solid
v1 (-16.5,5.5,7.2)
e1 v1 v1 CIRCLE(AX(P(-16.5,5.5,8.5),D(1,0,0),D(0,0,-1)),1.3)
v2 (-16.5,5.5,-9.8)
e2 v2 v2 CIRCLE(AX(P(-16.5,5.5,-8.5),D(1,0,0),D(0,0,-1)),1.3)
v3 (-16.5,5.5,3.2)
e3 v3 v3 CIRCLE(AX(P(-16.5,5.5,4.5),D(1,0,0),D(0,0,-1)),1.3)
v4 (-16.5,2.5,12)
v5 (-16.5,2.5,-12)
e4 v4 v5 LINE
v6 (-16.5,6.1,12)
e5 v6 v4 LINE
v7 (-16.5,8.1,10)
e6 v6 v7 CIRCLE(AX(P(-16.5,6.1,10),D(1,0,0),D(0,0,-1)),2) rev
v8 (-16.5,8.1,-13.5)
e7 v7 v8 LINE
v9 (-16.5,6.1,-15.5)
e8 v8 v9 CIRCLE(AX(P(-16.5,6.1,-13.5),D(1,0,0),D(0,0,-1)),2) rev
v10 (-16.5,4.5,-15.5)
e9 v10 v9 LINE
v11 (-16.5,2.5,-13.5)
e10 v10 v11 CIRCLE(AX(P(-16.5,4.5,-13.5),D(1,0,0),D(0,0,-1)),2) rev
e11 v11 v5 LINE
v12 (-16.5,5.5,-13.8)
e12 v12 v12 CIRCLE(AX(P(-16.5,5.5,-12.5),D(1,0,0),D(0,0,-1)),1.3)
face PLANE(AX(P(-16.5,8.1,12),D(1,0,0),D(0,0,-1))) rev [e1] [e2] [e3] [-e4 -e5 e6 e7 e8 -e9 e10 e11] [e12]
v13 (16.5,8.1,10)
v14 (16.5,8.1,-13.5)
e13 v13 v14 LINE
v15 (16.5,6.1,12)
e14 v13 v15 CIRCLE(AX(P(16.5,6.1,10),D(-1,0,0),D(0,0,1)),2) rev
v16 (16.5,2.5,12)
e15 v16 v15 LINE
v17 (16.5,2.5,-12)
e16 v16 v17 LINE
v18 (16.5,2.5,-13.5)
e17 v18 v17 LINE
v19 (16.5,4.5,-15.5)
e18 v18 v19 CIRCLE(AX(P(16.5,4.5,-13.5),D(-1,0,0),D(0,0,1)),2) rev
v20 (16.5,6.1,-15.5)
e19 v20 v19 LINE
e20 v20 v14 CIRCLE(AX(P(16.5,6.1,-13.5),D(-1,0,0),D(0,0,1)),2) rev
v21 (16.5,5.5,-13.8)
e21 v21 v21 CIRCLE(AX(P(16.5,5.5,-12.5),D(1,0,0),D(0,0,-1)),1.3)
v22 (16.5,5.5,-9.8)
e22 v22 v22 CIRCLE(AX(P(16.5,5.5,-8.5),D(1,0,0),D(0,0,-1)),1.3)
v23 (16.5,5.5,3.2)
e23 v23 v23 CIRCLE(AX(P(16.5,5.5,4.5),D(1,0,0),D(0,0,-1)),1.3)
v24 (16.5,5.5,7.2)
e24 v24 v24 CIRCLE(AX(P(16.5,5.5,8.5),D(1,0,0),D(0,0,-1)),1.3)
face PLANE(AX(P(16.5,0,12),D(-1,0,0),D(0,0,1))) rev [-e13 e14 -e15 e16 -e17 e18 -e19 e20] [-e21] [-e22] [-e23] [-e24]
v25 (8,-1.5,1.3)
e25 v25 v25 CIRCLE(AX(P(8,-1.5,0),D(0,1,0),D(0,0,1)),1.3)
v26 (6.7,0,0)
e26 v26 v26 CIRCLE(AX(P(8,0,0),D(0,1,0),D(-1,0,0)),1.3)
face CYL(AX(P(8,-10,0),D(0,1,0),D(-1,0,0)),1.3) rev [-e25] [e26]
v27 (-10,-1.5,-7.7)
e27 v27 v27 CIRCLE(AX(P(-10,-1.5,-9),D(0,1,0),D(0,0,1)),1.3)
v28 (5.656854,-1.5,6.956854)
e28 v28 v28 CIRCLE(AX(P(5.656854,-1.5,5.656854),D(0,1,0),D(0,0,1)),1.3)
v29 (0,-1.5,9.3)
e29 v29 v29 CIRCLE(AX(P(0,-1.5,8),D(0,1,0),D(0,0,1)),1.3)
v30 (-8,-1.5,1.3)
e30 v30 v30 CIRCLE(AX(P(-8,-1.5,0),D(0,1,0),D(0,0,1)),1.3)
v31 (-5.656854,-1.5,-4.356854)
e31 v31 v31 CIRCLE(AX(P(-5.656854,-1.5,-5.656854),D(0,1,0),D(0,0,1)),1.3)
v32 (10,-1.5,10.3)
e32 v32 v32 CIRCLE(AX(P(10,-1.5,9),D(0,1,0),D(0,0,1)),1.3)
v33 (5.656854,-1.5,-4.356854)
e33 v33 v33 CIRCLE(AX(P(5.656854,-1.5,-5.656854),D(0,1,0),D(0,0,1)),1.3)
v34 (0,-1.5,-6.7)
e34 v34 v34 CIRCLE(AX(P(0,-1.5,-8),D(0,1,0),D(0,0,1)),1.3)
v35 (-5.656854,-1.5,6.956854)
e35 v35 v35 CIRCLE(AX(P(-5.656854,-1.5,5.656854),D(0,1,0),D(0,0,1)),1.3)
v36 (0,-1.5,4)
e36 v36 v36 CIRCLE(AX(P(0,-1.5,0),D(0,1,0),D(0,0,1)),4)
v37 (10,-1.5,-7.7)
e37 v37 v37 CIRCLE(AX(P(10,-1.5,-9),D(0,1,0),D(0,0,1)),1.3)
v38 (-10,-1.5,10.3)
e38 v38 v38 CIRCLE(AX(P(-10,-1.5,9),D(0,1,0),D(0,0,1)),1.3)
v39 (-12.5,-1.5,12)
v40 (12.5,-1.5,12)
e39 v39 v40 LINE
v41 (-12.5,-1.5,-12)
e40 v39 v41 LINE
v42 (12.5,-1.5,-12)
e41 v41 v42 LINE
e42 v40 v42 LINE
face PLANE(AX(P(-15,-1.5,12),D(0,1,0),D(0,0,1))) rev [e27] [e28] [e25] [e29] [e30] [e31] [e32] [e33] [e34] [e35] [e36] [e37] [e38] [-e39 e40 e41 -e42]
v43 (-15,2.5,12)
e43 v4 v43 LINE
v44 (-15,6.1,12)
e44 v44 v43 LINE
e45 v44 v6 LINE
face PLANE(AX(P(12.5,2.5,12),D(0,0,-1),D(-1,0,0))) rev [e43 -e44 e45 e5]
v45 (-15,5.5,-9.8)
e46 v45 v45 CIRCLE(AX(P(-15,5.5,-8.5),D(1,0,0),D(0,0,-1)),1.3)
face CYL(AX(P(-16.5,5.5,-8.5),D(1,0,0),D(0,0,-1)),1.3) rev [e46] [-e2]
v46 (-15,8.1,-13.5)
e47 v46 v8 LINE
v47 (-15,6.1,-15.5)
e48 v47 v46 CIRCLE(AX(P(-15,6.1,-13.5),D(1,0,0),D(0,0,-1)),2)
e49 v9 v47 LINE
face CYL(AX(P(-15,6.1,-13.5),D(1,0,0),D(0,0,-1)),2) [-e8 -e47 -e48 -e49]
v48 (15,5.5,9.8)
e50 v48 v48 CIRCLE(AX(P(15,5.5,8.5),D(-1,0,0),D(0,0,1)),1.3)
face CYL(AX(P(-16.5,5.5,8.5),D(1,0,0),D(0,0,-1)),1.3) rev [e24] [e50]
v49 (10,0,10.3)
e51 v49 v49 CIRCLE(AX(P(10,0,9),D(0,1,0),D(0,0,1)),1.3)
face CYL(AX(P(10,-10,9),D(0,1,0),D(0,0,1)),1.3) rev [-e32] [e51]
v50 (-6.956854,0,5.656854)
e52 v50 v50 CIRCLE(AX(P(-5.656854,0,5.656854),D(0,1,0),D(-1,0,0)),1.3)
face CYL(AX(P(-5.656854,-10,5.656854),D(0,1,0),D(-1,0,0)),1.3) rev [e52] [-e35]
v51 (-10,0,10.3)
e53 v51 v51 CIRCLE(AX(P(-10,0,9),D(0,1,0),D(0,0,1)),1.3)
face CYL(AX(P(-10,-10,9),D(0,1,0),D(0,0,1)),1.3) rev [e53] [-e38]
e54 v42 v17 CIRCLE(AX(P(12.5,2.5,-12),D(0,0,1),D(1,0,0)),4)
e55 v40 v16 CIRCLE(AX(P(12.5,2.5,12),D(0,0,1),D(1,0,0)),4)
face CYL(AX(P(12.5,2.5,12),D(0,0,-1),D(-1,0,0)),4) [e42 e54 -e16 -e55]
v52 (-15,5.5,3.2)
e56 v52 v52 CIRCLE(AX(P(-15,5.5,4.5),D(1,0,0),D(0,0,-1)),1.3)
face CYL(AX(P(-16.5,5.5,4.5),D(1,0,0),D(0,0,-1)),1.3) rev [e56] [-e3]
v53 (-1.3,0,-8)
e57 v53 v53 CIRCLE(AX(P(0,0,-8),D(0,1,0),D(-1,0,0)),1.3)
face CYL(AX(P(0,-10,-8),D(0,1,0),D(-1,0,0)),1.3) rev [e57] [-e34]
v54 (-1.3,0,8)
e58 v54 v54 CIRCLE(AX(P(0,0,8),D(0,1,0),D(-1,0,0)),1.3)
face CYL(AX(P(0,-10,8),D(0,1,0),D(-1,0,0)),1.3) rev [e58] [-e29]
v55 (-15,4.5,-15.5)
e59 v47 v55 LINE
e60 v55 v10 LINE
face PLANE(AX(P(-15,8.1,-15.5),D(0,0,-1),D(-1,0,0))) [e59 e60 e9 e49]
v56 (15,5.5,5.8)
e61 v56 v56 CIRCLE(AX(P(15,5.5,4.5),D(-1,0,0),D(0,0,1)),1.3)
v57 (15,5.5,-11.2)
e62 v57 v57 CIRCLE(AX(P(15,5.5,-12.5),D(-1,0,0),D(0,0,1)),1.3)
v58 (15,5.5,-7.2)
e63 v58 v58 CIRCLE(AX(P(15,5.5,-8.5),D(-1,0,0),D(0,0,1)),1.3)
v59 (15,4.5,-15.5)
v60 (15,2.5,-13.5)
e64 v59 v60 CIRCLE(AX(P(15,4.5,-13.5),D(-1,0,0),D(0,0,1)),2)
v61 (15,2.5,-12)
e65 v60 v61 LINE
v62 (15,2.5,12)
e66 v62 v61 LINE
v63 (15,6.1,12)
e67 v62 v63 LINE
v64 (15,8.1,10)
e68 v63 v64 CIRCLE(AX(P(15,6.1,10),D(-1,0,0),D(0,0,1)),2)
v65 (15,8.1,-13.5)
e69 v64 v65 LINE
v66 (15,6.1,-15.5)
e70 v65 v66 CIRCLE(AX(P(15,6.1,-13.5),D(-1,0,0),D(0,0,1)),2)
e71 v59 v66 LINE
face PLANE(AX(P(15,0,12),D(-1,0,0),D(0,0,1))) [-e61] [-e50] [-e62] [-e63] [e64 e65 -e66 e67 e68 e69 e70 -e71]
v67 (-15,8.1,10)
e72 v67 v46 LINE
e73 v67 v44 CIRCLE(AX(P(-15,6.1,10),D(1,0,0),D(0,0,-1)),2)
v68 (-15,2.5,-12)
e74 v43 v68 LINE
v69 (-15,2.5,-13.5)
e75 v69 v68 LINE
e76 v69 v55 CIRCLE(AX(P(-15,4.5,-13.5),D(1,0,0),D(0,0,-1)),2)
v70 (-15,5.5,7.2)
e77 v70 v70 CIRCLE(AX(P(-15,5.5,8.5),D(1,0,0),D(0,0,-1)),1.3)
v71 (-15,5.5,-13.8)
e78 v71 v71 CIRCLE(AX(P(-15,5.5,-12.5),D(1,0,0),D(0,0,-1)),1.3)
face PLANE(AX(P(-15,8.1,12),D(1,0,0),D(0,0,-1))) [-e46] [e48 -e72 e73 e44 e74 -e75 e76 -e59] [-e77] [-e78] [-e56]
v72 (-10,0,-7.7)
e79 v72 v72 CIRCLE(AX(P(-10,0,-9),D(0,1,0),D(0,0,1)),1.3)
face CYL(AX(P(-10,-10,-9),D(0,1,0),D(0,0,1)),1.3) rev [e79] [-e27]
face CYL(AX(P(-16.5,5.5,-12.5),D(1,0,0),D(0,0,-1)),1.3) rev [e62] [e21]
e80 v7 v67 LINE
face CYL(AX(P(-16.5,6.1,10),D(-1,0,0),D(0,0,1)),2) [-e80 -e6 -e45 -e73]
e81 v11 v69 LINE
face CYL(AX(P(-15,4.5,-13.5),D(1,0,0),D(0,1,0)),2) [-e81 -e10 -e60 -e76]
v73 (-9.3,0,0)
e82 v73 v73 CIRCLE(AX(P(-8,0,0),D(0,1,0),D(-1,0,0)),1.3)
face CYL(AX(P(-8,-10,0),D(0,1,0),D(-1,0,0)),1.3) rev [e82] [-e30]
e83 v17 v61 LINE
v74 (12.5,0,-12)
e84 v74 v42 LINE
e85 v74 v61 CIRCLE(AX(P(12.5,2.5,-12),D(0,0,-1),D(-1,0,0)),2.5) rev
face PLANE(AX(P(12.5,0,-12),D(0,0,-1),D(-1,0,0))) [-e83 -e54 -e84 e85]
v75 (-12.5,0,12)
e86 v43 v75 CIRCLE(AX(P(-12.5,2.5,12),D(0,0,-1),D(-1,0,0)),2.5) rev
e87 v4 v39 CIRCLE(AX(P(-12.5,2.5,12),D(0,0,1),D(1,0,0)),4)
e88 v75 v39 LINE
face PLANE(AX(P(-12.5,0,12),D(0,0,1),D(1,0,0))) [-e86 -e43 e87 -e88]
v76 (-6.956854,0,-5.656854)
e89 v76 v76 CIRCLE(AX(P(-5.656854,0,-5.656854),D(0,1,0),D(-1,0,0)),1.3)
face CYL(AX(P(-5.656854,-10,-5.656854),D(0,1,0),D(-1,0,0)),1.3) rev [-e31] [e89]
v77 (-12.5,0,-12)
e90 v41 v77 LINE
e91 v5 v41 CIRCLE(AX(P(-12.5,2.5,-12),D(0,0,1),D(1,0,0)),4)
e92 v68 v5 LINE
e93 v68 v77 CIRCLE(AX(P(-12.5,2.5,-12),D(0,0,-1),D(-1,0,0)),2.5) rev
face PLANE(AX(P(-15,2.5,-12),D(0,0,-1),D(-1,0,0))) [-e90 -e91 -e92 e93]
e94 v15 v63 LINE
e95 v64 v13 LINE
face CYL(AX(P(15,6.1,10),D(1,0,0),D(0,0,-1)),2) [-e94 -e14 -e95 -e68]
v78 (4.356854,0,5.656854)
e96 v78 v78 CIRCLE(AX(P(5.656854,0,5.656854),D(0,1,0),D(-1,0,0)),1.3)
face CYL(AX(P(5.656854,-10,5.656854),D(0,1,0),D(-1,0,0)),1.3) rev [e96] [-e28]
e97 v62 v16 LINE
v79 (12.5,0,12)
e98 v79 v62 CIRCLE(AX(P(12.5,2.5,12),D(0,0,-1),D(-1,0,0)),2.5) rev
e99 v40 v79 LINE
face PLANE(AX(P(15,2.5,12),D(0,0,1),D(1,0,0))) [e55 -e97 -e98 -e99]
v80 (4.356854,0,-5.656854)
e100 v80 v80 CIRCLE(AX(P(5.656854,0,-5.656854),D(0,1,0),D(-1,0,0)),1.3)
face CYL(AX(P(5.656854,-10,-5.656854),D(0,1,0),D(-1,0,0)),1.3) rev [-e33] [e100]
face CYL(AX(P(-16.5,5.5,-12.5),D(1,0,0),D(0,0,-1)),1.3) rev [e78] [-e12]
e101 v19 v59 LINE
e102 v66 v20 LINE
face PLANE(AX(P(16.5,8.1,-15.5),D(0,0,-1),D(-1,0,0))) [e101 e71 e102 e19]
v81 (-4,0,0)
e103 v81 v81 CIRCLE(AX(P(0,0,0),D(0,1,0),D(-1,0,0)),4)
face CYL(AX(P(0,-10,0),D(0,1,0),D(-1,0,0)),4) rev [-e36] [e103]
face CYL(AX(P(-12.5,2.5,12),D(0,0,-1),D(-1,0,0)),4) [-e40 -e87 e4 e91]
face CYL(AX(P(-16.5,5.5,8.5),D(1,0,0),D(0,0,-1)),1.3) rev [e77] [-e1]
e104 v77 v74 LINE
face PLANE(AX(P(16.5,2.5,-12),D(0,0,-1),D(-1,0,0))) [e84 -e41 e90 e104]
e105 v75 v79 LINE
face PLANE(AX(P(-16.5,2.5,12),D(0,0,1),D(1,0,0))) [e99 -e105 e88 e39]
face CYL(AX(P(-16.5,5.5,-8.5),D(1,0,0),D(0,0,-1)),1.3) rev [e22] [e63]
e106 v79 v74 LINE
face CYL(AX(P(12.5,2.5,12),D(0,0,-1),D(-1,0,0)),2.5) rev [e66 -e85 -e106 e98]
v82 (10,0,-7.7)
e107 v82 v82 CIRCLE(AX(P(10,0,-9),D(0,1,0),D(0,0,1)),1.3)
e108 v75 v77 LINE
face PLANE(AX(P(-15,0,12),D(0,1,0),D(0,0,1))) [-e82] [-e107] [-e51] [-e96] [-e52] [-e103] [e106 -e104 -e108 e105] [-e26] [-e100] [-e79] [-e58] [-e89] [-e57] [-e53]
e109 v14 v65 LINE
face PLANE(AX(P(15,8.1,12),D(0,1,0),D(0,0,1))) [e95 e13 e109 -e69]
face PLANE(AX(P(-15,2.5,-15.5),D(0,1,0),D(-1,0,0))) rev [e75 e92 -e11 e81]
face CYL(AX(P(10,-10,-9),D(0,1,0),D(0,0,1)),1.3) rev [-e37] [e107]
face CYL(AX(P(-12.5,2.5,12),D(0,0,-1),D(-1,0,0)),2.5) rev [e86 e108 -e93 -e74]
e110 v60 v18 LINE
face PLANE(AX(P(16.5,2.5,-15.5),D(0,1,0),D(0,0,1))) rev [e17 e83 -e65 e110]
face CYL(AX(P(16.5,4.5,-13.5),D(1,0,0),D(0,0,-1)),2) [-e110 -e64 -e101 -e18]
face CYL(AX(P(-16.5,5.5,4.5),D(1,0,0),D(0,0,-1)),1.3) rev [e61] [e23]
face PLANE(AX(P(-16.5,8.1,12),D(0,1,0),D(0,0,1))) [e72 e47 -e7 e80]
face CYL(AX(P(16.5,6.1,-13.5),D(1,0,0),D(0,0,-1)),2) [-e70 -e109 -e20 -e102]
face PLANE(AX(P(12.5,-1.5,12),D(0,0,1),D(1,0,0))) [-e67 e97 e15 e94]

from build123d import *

# Parameters (mm, degrees)
BASE_FLANGE1_DEPTH      = 12
SKETCH5_R               = 4
SKETCH5_R_2             = 1.3
CUT_EXTRUDE1_DEPTH      = 10
SKETCH6_W               = 1.5
SKETCH6_H               = 5.6
BOSS_EXTRUDE1_DEPTH     = 3.5
CUT_EXTRUDE2_DEPTH      = 25.04391815
CUT_EXTRUDE2_DEPTH_BACK = 25.04391815
SKETCH7_R               = 1.3
FILLET1_R               = 2
SKETCH8_R               = 1.3
CUT_EXTRUDE3_DEPTH      = 10


# Sheet-metal steps are written as plain solids
with BuildPart() as part:
    # Sketch1 → Base-Flange1 (new, symmetric)
    with BuildSketch(Plane.XY):
        with BuildLine():
            Line((-15, 8.1), (-15, 2.5))
            ThreePointArc((-15, 2.5), (-14.267766953, 0.732233047), (-12.5, 0))
            Line((-12.5, 0), (12.5, 0))
            ThreePointArc((12.5, 0), (14.267766953, 0.732233047), (15, 2.5))
            Line((15, 2.5), (15, 8.1))
            Line((15, 8.1), (16.5, 8.1))
            Line((16.5, 8.1), (16.5, 2.5))
            ThreePointArc((16.5, 2.5), (15.328427125, -0.328427125), (12.5, -1.5))
            Line((12.5, -1.5), (-12.5, -1.5))
            ThreePointArc((-12.5, -1.5), (-15.328427125, -0.328427125), (-16.5, 2.5))
            Line((-16.5, 2.5), (-16.5, 8.1))
            Line((-16.5, 8.1), (-15, 8.1))
        make_face()
    extrude(amount=BASE_FLANGE1_DEPTH, both=True)

    # Sketch5 → Cut-Extrude1 (cut)
    with BuildSketch(Plane(origin=(0, 0, 0), x_dir=(1, 0, 0), z_dir=(0, 1, 0))):
        with Locations(Location((0, 0, 0), (0, 0, 180))):
            Circle(SKETCH5_R)
        with Locations(Location((0, 8, 0), (0, 0, 180))):
            Circle(SKETCH5_R_2)
        with Locations(Location((5.656854249, 5.656854249, 0), (0, 0, 180))):
            Circle(SKETCH5_R_2)
        with Locations(Location((8, 0, 0), (0, 0, 180))):
            Circle(SKETCH5_R_2)
        with Locations(Location((5.656854249, -5.656854249, 0), (0, 0, 180))):
            Circle(SKETCH5_R_2)
        with Locations(Location((0, -8, 0), (0, 0, 180))):
            Circle(SKETCH5_R_2)
        with Locations(Location((-5.656854249, -5.656854249, 0), (0, 0, 180))):
            Circle(SKETCH5_R_2)
        with Locations(Location((-8, 0, 0), (0, 0, 180))):
            Circle(SKETCH5_R_2)
        with Locations(Location((-5.656854249, 5.656854249, 0), (0, 0, 180))):
            Circle(SKETCH5_R_2)
    extrude(amount=-CUT_EXTRUDE1_DEPTH, mode=Mode.SUBTRACT)

    # Sketch6 → Boss-Extrude1 (add)
    with BuildSketch(Plane(origin=(0, 0, -12), x_dir=(-1, 0, 0), z_dir=(0, 0, -1))):
        with Locations((-15.75, 5.3)):
            Rectangle(SKETCH6_W, SKETCH6_H)
        with Locations((15.75, 5.3)):
            Rectangle(SKETCH6_W, SKETCH6_H)
    extrude(amount=BOSS_EXTRUDE1_DEPTH)

    # Sketch7 → Cut-Extrude2 (cut, two sides: drawn at the far end of the back side and taken through both)
    with BuildSketch(Plane(origin=(0, 0, 0), x_dir=(0, 0, -1), z_dir=(1, 0, 0)).offset(-CUT_EXTRUDE2_DEPTH_BACK)):
        with Locations((-8.5, 5.5)):
            Circle(SKETCH7_R)
        with Locations((-4.5, 5.5)):
            Circle(SKETCH7_R)
        with Locations((8.5, 5.5)):
            Circle(SKETCH7_R)
        with Locations((12.5, 5.5)):
            Circle(SKETCH7_R)
    extrude(amount=CUT_EXTRUDE2_DEPTH + CUT_EXTRUDE2_DEPTH_BACK, mode=Mode.SUBTRACT)

    # Fillet1
    fillet1_edges = [part.edges().sort_by_distance(p)[0] for p in [
        (15.75, 8.1, -15.5),
        (15.75, 2.5, -15.5),
        (-15.75, 8.1, -15.5),
        (-15.75, 2.5, -15.5),
        (-15.75, 8.1, 12),
        (15.75, 8.1, 12),
    ]]
    fillet(fillet1_edges, radius=FILLET1_R)

    # Sketch8 → Cut-Extrude3 (cut)
    with BuildSketch(Plane(origin=(0, 0, 0), x_dir=(1, 0, 0), z_dir=(0, 1, 0))):
        with Locations(Location((-10, 9, 0), (0, 0, 270))):
            Circle(SKETCH8_R)
        with Locations(Location((10, 9, 0), (0, 0, 270))):
            Circle(SKETCH8_R)
        with Locations(Location((-10, -9, 0), (0, 0, 270))):
            Circle(SKETCH8_R)
        with Locations(Location((10, -9, 0), (0, 0, 270))):
            Circle(SKETCH8_R)
    extrude(amount=-CUT_EXTRUDE3_DEPTH, mode=Mode.SUBTRACT)


solid = part.part
